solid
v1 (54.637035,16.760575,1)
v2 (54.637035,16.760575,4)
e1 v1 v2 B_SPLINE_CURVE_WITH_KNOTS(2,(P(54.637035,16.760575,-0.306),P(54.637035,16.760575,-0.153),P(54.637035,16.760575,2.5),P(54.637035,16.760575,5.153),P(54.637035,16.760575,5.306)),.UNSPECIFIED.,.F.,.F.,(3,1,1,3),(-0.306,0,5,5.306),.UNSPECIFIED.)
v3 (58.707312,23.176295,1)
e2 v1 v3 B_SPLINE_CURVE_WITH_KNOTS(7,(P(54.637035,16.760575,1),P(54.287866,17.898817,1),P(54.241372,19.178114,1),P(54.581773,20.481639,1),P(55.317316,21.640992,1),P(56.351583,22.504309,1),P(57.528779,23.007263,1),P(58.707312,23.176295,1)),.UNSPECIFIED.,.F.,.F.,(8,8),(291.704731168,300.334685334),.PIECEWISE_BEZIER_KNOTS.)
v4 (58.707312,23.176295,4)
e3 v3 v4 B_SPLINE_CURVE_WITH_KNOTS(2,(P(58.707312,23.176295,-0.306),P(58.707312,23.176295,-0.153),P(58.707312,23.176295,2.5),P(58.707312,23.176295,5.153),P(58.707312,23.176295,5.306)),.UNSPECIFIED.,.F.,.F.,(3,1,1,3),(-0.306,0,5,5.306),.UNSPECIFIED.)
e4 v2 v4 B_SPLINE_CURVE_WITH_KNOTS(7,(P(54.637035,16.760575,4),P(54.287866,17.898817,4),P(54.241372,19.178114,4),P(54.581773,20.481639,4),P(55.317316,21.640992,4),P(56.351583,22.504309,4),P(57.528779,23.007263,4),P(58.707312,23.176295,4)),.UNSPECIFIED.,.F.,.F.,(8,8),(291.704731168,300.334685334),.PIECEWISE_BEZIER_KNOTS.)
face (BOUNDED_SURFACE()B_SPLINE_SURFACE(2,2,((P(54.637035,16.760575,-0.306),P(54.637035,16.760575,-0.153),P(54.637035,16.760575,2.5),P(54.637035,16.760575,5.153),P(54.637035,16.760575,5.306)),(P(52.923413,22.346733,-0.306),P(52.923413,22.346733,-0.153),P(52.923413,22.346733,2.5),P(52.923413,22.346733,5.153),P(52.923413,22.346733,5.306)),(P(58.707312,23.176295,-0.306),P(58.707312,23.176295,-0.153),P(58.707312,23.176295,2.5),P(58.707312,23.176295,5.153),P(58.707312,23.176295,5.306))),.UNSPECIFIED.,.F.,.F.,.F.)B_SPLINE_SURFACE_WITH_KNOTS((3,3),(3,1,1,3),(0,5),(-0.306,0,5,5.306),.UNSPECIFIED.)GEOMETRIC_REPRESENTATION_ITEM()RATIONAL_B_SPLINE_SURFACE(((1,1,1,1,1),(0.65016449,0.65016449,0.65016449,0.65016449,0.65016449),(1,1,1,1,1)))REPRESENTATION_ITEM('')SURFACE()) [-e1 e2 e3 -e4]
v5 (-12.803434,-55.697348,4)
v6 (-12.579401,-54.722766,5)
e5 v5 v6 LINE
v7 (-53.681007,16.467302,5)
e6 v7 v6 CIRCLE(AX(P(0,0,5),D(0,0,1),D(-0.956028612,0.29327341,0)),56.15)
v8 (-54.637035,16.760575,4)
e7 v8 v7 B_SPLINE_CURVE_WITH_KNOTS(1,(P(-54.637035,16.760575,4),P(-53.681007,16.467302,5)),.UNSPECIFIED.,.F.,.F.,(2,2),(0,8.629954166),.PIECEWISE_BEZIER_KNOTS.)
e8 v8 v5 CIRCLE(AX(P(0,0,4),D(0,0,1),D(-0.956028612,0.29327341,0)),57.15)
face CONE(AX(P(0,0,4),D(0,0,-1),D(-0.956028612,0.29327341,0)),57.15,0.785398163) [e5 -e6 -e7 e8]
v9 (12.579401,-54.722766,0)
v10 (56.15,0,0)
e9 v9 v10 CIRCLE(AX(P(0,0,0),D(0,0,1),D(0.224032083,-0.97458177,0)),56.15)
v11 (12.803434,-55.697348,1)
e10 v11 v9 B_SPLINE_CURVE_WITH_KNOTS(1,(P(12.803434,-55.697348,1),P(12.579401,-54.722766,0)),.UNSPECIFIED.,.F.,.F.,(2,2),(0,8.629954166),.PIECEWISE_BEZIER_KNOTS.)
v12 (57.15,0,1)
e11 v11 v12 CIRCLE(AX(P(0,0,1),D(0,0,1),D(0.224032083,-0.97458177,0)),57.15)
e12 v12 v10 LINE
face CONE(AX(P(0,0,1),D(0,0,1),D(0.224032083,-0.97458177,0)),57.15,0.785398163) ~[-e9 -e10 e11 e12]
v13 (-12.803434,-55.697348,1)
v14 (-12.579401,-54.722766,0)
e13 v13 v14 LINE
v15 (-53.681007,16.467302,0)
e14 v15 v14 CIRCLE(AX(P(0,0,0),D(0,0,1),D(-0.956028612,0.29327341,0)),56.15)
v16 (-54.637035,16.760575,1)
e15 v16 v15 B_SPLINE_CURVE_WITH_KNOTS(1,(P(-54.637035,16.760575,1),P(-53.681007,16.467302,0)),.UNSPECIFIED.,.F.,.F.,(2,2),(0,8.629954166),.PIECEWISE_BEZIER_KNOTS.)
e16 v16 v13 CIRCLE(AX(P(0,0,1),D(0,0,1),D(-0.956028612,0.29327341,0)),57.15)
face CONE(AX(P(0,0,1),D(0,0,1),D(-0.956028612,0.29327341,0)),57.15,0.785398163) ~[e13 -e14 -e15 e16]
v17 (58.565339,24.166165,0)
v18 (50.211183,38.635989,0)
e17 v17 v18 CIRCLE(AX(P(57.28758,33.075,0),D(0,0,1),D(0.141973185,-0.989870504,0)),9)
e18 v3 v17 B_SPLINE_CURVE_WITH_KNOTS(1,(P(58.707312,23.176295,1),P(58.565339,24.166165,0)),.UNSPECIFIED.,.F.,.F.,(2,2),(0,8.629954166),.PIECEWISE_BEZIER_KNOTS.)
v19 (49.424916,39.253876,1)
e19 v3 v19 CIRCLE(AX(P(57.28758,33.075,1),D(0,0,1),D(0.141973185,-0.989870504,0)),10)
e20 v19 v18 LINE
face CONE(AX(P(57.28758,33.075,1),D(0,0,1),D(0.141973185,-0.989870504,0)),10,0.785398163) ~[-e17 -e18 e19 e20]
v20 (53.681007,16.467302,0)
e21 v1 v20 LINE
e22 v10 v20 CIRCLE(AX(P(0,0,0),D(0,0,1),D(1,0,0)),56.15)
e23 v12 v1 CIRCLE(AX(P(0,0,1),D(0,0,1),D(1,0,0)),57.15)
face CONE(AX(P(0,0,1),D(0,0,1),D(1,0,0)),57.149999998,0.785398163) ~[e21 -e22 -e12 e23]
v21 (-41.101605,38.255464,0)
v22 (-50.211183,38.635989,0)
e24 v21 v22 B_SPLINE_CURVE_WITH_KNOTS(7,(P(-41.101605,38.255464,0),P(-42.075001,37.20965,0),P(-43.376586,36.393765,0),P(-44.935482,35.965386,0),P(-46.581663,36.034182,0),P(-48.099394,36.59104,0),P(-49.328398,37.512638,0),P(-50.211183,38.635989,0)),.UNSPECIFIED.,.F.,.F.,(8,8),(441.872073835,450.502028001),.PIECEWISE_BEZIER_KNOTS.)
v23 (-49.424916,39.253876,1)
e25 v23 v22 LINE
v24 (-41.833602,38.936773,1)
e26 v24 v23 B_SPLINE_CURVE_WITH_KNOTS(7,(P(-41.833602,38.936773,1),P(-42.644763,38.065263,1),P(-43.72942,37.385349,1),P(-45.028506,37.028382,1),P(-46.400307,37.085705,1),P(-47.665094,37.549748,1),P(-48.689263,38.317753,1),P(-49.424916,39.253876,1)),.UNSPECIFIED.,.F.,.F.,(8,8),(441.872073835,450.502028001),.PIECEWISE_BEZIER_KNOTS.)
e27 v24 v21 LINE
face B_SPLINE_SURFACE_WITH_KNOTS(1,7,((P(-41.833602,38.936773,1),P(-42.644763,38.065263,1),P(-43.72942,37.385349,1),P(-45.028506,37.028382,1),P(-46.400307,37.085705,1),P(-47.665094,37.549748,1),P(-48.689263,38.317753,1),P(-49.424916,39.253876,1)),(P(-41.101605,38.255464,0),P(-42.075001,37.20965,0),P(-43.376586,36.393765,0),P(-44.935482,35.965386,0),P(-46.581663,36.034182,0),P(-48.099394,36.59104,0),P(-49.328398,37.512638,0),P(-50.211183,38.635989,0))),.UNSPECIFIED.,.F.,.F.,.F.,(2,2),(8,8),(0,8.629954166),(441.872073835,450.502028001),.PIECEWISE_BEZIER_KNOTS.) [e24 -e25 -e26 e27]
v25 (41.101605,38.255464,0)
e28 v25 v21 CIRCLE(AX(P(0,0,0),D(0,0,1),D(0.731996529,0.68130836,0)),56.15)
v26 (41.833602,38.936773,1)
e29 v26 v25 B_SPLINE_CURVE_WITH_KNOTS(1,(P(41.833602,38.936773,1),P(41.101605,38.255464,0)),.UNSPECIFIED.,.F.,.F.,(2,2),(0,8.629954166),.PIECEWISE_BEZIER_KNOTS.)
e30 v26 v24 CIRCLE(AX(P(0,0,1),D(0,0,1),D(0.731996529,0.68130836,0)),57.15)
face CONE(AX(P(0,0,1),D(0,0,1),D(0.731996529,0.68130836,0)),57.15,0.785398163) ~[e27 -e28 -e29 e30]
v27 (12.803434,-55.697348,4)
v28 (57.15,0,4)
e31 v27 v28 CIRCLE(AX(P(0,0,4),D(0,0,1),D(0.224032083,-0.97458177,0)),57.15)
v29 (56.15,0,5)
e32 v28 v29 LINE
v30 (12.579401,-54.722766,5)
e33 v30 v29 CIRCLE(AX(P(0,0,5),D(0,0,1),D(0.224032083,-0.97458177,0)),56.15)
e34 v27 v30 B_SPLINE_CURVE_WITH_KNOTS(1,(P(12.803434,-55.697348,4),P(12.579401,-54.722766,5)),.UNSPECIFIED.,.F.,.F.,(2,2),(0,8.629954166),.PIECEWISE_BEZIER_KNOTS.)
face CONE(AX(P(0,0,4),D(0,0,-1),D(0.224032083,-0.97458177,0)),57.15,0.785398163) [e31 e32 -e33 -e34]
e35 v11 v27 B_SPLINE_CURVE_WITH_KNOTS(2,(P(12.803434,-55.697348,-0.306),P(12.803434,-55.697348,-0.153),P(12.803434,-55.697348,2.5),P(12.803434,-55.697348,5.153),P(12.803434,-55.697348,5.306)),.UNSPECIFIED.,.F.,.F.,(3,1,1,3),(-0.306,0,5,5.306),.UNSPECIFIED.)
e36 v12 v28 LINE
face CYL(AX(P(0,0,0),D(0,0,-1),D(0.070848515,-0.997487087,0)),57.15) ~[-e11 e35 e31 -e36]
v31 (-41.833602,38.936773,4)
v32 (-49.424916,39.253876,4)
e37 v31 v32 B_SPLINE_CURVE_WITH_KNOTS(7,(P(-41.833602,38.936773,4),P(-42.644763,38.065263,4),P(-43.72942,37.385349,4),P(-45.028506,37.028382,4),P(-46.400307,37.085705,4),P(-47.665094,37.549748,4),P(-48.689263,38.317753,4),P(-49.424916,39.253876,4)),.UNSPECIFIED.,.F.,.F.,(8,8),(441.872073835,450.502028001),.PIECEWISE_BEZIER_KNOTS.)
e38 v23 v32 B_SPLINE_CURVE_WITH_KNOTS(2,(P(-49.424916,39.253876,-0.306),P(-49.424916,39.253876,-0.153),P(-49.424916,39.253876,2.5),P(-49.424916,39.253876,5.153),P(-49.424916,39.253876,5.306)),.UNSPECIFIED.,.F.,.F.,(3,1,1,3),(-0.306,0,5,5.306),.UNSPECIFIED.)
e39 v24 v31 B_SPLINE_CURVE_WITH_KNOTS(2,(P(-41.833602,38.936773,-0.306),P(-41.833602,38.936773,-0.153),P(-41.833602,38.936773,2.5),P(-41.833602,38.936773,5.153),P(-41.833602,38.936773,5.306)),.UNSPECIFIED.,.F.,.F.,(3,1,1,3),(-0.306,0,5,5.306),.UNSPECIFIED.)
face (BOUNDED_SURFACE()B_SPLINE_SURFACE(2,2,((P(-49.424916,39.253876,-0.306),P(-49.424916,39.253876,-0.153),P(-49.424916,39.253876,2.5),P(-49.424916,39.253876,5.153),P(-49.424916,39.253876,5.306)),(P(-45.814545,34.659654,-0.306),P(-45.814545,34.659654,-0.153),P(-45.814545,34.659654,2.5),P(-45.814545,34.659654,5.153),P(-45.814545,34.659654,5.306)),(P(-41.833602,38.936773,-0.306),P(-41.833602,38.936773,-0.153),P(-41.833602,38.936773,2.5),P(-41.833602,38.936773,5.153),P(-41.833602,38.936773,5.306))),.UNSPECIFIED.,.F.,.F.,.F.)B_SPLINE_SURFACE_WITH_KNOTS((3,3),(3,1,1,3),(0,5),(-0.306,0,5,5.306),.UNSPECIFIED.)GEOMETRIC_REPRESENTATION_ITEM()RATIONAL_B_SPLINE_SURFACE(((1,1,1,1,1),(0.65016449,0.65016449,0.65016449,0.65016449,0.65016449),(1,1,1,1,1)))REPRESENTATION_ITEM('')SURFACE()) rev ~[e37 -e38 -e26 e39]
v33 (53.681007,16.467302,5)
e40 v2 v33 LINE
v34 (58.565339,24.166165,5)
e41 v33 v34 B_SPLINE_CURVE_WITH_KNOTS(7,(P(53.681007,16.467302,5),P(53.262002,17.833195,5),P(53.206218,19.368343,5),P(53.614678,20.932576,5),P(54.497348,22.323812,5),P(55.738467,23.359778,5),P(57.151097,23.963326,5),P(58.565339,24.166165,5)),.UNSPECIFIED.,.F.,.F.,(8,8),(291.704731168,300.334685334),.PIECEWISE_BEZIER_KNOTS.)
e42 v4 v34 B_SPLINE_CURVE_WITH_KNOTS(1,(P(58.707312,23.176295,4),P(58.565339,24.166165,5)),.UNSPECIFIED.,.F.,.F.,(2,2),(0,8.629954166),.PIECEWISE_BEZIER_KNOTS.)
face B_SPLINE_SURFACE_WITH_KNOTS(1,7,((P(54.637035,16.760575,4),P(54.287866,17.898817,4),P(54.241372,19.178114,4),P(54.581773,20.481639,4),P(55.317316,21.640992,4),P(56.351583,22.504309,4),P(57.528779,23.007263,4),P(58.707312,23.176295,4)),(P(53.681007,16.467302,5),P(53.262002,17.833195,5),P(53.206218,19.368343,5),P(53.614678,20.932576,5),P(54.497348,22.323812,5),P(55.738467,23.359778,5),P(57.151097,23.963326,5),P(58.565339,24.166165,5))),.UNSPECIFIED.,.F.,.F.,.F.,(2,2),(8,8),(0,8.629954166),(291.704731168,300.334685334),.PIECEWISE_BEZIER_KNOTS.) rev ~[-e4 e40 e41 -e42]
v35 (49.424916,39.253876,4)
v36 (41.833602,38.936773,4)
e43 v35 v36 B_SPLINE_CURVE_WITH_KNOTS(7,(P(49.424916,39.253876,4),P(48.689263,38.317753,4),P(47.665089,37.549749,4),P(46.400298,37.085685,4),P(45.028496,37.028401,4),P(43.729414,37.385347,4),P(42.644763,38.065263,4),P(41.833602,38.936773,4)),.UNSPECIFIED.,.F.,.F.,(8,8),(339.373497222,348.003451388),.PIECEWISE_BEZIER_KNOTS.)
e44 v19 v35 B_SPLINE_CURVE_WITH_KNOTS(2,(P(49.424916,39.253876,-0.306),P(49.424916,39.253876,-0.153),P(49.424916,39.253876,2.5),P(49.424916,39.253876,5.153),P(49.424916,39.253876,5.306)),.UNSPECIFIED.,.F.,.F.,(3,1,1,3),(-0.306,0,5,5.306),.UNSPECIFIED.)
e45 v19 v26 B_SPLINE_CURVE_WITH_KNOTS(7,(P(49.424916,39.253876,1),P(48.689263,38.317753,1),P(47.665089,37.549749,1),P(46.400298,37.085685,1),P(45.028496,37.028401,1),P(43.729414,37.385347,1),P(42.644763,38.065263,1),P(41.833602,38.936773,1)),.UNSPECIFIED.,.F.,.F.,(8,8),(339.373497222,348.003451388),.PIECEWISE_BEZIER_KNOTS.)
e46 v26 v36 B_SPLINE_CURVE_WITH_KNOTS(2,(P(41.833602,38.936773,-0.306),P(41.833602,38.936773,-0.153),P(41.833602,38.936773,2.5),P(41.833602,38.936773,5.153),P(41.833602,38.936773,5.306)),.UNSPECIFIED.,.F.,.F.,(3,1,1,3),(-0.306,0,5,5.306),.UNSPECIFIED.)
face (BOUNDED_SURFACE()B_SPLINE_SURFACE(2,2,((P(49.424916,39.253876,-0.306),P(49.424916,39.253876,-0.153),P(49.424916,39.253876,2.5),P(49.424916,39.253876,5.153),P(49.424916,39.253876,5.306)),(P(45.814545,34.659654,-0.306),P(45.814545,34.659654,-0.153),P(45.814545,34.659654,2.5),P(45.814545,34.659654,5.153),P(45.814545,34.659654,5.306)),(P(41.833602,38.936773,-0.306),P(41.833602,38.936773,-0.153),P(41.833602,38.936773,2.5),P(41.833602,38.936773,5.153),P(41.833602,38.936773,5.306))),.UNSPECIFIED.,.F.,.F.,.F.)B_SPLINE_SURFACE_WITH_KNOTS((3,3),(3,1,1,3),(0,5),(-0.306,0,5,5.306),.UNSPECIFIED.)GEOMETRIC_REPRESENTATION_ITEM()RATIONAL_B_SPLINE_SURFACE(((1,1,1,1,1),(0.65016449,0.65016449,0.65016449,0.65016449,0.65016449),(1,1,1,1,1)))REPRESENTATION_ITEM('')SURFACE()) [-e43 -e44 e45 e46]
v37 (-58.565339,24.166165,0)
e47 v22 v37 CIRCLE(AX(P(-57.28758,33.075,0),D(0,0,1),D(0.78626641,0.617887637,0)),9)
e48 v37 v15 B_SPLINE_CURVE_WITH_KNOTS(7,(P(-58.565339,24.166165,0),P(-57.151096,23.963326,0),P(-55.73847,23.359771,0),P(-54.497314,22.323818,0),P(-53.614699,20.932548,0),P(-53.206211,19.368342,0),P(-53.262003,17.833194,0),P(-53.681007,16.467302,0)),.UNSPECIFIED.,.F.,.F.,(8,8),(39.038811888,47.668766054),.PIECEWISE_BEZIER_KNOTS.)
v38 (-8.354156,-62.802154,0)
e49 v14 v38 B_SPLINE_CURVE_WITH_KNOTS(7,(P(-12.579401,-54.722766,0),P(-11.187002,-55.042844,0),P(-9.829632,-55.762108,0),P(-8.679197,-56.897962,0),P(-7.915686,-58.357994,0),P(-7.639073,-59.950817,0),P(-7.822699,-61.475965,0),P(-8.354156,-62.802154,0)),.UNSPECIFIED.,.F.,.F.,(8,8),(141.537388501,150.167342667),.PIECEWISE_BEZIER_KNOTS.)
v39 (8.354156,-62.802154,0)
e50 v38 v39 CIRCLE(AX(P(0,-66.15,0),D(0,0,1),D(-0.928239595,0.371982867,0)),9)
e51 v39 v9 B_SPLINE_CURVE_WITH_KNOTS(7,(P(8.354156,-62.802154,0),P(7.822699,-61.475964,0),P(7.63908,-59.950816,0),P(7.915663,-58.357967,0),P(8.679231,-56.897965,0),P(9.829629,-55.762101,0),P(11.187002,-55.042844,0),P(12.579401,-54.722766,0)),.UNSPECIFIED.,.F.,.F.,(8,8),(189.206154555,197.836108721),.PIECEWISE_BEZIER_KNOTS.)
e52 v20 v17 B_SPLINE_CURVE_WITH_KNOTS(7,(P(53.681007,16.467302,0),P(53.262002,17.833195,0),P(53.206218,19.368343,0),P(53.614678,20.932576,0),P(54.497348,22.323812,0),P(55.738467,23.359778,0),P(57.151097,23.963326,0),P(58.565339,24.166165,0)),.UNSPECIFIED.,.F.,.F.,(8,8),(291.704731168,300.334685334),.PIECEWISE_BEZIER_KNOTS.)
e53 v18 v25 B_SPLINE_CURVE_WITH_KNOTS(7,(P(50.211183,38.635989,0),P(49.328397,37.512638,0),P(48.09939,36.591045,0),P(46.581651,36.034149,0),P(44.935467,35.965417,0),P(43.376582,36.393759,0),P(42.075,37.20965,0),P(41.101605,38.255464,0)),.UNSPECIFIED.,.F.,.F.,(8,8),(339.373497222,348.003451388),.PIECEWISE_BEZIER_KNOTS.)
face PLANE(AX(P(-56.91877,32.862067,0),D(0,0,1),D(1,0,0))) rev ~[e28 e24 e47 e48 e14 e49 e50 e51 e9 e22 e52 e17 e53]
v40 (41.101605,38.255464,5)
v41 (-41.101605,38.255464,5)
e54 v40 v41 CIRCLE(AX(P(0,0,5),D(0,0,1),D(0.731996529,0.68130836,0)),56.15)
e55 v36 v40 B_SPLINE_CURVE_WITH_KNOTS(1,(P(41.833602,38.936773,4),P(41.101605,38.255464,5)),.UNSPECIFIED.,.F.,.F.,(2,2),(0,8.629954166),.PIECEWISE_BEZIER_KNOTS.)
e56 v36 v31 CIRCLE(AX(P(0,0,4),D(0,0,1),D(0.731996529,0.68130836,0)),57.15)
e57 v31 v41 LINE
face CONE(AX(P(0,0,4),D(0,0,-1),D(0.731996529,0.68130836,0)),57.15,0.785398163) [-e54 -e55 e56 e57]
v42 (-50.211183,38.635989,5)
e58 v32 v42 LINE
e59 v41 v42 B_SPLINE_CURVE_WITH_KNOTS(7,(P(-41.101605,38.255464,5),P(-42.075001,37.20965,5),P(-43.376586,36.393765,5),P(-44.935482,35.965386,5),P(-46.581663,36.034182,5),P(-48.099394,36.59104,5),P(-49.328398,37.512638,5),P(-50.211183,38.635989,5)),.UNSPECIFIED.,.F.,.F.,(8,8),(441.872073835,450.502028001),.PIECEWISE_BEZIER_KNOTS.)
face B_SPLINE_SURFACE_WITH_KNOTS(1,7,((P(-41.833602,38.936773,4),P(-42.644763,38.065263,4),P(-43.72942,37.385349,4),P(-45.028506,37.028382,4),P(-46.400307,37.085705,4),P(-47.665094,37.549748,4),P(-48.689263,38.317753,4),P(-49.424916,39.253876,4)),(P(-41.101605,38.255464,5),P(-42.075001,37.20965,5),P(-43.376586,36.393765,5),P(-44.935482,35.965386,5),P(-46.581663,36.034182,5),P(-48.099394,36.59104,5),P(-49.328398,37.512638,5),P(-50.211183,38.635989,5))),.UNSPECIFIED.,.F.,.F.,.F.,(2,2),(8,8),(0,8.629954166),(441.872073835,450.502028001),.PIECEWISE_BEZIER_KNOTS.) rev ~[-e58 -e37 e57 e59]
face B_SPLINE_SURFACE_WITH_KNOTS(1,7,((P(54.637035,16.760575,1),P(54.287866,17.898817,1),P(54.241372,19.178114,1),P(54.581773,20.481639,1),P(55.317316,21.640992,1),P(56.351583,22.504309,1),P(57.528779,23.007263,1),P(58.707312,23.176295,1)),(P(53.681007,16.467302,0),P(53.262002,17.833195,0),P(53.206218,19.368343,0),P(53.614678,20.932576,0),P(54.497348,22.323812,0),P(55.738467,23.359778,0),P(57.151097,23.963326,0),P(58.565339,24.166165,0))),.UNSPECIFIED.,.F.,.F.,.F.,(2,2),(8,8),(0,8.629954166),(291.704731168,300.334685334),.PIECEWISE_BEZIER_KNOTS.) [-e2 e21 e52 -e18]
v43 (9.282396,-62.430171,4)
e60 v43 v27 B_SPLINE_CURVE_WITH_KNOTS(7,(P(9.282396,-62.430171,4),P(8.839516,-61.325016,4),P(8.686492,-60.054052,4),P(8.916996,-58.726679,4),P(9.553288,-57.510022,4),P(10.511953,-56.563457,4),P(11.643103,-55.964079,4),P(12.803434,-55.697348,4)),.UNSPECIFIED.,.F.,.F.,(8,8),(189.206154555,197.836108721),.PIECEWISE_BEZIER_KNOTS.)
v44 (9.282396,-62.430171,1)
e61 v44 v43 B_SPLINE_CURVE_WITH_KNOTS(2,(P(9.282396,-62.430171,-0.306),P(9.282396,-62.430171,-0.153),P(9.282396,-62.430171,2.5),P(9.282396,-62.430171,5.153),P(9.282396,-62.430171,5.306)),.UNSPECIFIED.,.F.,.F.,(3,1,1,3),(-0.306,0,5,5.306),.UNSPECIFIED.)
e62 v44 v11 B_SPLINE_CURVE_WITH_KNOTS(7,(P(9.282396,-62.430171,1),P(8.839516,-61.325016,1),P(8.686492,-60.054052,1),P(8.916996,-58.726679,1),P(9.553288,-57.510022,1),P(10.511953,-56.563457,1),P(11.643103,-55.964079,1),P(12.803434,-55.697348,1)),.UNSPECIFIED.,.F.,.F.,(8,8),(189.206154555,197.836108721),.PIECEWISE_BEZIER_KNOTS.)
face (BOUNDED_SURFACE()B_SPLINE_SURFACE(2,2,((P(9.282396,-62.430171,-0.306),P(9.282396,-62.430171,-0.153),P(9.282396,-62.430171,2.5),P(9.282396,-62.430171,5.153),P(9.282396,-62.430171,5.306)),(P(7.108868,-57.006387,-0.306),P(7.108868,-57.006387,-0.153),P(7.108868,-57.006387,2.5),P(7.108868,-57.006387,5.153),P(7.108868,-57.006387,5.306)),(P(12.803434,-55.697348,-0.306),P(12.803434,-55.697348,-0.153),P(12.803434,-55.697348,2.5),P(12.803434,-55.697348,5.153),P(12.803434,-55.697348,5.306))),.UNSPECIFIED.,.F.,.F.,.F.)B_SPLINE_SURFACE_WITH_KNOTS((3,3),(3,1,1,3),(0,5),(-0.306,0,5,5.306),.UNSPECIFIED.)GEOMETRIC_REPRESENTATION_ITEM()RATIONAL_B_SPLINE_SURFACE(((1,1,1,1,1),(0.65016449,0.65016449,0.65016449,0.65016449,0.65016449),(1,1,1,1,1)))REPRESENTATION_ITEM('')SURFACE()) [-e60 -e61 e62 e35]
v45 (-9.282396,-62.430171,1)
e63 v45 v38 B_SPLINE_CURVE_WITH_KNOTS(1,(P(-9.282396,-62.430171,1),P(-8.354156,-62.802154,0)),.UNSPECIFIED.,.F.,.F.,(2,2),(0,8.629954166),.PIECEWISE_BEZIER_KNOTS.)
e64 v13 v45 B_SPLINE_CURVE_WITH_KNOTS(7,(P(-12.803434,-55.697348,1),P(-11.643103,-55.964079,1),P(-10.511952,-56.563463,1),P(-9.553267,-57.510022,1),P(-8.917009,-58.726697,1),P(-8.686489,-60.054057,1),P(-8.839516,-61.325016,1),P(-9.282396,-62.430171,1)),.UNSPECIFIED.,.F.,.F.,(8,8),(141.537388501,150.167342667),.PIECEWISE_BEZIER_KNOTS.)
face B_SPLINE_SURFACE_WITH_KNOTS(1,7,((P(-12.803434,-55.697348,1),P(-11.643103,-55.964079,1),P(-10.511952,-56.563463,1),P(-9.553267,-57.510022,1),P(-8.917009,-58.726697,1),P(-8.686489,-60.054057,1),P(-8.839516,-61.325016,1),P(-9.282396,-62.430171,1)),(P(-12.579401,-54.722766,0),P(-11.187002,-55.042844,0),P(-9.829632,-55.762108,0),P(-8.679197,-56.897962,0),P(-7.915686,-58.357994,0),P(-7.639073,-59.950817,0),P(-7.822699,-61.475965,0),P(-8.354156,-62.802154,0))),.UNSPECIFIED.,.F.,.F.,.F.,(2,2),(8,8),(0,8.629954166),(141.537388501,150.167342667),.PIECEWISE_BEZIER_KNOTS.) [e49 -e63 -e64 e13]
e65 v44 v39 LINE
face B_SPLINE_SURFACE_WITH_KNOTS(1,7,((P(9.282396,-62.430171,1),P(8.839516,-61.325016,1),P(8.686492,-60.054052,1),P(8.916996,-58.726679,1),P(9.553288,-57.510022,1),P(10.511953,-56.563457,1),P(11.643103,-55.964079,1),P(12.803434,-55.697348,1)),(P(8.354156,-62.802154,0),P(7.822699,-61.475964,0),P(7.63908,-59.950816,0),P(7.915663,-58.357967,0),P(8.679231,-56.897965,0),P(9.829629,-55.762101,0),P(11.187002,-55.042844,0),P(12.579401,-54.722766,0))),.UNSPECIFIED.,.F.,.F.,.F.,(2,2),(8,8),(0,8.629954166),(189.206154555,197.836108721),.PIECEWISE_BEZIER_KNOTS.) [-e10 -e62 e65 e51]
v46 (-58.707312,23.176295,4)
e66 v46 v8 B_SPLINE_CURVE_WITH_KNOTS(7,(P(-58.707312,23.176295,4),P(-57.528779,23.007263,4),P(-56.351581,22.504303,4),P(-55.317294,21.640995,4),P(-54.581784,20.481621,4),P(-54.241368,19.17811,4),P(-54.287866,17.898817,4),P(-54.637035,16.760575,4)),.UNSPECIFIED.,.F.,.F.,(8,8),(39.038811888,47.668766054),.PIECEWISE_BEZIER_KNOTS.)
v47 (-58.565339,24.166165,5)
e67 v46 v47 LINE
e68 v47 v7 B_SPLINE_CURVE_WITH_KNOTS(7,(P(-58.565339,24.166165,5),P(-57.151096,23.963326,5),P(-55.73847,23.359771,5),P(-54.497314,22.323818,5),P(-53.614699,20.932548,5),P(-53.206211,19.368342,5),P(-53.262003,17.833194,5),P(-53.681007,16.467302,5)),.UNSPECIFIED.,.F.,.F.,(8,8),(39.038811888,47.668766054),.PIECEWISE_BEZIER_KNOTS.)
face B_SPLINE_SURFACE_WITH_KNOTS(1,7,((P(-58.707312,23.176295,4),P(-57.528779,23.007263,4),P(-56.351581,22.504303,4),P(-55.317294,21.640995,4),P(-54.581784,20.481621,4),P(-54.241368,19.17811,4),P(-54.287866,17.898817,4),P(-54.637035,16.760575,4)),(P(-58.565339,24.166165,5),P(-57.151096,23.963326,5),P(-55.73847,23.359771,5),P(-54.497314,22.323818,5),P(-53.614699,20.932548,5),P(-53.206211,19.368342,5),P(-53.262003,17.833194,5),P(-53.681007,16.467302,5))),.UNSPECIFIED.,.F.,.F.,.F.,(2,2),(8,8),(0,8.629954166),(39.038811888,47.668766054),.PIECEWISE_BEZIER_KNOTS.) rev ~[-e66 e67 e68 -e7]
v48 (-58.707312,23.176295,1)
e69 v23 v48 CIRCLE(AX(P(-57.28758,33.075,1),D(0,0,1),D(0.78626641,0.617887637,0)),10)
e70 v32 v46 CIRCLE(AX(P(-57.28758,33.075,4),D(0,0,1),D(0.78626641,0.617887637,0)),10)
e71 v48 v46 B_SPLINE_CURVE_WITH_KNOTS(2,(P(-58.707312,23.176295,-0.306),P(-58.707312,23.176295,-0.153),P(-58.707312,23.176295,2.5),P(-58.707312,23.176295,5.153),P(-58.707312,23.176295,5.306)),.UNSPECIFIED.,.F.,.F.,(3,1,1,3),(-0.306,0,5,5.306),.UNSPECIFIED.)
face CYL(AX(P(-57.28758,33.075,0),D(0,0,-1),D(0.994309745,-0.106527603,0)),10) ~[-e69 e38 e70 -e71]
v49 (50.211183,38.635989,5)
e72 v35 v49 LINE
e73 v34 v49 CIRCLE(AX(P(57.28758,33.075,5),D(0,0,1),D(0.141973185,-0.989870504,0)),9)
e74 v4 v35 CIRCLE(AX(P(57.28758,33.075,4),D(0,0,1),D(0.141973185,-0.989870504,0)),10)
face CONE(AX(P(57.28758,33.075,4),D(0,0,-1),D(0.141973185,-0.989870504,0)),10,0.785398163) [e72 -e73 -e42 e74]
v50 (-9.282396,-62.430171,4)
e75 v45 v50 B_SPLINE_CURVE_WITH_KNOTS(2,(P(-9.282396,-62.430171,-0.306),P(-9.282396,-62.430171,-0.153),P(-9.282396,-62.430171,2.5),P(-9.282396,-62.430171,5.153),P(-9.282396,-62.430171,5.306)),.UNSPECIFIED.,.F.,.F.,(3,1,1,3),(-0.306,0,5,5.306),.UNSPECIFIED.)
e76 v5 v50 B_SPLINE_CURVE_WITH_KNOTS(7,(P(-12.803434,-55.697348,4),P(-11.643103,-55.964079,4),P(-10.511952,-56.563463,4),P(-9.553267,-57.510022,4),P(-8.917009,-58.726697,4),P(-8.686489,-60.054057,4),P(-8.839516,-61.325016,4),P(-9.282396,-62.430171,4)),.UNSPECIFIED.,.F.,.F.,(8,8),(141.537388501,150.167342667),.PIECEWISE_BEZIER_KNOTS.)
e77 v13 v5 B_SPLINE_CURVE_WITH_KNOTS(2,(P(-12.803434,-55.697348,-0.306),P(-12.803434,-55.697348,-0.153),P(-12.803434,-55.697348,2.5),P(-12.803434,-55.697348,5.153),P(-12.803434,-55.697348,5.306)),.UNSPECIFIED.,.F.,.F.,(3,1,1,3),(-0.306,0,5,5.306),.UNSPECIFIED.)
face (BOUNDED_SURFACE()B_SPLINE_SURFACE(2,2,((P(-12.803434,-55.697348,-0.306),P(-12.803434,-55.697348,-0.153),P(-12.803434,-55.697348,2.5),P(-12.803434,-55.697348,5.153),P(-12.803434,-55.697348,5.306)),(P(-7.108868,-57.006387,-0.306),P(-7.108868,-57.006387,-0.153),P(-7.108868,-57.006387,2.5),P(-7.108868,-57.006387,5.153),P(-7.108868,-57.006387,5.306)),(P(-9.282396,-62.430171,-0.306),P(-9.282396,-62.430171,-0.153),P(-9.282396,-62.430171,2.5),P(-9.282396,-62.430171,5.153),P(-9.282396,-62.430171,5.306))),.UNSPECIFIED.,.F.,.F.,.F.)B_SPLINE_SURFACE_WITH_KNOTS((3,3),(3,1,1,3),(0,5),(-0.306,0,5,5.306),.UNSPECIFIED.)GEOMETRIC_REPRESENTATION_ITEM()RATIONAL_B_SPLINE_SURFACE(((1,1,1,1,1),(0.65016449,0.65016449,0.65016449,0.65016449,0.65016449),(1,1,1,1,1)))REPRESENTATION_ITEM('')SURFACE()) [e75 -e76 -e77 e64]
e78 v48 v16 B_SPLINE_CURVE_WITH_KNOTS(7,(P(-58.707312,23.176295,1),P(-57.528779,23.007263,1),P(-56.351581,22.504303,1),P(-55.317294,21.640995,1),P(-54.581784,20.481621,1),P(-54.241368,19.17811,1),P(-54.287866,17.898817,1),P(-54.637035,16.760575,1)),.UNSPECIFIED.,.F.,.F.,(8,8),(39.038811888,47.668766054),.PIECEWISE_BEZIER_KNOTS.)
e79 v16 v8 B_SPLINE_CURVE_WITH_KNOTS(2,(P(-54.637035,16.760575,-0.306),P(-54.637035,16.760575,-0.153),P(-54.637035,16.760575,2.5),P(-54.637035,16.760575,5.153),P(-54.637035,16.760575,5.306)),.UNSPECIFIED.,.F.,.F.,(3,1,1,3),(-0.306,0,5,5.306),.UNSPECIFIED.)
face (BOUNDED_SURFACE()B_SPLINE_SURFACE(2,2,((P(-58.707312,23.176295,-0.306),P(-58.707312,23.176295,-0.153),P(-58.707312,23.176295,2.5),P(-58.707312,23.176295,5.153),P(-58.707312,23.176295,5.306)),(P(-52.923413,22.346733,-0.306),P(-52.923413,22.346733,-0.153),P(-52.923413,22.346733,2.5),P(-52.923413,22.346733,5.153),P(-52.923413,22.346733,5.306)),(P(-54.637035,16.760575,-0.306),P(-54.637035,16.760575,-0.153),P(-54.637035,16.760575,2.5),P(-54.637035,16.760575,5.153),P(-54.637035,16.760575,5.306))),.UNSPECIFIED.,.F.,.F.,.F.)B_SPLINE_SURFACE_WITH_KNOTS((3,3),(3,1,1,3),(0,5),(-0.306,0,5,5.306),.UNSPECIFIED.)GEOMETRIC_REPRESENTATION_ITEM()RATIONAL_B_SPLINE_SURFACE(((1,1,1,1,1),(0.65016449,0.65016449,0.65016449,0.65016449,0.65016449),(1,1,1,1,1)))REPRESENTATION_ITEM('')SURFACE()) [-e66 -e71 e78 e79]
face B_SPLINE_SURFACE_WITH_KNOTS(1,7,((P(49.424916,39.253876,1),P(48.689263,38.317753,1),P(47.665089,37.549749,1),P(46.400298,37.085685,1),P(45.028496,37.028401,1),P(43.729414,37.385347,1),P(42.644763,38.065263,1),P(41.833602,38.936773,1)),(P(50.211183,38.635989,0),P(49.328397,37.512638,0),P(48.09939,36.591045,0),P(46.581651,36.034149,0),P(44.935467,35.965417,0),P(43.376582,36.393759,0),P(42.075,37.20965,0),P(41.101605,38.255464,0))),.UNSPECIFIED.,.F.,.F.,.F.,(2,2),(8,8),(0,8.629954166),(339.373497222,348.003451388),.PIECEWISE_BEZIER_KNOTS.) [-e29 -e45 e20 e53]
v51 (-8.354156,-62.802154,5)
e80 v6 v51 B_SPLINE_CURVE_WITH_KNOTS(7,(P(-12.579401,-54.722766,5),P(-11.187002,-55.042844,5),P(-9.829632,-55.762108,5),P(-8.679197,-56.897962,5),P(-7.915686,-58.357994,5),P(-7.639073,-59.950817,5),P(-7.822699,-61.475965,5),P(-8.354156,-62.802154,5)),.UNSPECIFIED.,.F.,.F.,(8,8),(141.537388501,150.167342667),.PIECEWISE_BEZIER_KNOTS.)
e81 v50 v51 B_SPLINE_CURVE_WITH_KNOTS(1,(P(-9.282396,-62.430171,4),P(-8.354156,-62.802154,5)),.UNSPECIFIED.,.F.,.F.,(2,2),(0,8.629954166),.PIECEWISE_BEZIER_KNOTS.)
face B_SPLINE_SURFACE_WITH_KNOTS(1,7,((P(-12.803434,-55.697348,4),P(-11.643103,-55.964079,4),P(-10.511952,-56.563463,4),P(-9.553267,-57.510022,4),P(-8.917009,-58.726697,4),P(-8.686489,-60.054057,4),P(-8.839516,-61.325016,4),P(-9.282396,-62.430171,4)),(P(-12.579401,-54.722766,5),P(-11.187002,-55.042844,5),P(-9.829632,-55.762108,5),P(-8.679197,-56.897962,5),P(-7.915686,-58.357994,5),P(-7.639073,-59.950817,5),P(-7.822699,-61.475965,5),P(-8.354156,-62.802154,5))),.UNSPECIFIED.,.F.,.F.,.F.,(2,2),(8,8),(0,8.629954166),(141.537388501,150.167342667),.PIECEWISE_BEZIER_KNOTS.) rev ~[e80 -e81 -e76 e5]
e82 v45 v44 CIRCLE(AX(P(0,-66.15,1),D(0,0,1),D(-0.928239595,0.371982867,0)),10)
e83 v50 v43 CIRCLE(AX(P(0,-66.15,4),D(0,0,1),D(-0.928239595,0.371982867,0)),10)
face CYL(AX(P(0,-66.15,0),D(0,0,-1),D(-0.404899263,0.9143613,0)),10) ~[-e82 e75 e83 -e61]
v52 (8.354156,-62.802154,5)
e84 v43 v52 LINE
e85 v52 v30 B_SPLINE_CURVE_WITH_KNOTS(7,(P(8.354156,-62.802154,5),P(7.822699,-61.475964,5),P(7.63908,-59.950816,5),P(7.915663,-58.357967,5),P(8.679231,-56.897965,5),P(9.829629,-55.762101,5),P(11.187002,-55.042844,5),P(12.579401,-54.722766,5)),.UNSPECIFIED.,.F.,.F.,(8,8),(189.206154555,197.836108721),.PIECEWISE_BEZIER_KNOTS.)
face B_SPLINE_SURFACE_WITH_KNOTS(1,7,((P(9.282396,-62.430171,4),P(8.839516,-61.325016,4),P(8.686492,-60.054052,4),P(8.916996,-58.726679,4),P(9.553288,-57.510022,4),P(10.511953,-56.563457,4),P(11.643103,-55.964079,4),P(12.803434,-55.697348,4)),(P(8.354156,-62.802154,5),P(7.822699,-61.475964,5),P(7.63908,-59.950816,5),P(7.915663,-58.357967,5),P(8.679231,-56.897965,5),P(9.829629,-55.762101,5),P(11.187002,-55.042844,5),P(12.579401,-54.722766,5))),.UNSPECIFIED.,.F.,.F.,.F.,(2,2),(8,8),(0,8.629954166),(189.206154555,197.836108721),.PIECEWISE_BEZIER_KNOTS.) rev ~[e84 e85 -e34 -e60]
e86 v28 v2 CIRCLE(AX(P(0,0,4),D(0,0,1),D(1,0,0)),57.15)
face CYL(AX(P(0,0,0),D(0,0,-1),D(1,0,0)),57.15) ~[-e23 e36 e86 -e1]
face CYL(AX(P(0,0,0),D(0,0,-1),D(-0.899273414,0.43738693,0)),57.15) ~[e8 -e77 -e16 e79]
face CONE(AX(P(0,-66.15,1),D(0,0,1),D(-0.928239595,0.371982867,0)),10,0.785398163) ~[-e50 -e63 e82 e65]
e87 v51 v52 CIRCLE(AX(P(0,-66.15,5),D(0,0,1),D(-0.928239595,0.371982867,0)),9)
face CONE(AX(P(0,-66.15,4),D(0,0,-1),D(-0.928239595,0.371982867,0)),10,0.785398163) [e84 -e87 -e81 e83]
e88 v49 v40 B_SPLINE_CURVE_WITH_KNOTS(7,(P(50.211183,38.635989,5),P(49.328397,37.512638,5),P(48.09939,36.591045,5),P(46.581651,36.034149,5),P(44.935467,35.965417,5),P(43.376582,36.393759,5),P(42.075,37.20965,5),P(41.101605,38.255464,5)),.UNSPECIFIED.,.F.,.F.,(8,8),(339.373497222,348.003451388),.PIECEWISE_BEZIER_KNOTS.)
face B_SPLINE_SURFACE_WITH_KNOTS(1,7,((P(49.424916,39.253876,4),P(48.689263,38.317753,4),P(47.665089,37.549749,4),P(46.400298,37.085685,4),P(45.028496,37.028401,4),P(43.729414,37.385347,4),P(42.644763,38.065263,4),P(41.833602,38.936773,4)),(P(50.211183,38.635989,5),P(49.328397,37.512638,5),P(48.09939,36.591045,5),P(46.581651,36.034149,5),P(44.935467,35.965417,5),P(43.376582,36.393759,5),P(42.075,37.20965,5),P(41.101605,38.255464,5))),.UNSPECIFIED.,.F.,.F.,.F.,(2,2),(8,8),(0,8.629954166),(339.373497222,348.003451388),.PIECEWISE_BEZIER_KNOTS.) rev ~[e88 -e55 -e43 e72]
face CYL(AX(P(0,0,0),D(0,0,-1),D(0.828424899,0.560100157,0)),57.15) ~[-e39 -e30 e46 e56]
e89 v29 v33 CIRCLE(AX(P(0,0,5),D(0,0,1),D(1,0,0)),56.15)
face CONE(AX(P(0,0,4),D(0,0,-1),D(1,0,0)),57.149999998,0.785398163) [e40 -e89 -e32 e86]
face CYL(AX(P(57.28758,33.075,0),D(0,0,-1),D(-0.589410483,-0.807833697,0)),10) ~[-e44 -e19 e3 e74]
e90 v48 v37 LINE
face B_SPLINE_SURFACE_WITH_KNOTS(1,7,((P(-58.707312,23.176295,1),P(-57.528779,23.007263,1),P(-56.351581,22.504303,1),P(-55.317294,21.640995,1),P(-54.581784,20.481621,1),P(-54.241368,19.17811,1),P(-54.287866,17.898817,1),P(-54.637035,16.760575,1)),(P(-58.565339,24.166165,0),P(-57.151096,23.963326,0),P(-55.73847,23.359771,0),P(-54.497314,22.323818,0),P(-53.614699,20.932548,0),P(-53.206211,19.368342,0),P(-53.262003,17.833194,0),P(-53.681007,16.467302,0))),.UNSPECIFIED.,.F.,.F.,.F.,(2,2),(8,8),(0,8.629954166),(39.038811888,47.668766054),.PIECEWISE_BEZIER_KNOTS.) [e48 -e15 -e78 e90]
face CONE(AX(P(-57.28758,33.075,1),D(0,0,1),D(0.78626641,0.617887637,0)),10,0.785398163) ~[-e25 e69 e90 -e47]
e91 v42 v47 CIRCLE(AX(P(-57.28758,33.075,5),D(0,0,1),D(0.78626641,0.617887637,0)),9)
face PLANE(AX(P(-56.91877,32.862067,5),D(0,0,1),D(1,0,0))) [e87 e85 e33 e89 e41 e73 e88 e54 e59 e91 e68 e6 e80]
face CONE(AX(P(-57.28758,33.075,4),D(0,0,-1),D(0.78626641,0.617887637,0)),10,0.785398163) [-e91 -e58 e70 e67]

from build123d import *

# Parameters (mm, degrees)
F1_DEPTH = 5
F2_R     = 5
F3_SIZE  = 1


with BuildPart() as f1:
    # F0 (on Top) → F1 (new body)
    with BuildSketch(Plane.XY):
        with BuildLine():
            ThreePointArc((-51.3934756327, 24.996663025), (-49.4933518263, 28.575), (-47.3444830059, 32.0097239742))
            ThreePointArc((-47.3444830059, 32.0097239742), (-65.9478344982, 38.075), (-51.3934756327, 24.996663025))
        make_face()
        with BuildLine():
            ThreePointArc((47.3444830059, 32.0097239742), (49.4933518263, 28.575), (51.3934756327, 24.996663025))
            ThreePointArc((51.3934756327, 24.996663025), (65.9478344982, 38.075), (47.3444830059, 32.0097239742))
        make_face()
        with BuildLine():
            ThreePointArc((4.0489926269, -57.0063869992), (41.8181923846, -38.9533218826), (57.15, 0))
            ThreePointArc((57.15, 0), (55.6922778867, 12.8254701198), (51.3934756327, 24.996663025))
            ThreePointArc((51.3934756327, 24.996663025), (49.4933518263, 28.575), (47.3444830059, 32.0097239742))
            ThreePointArc((47.3444830059, 32.0097239742), (0, 57.15), (-47.3444830059, 32.0097239742))
            ThreePointArc((-47.3444830059, 32.0097239742), (-49.4933518263, 28.575), (-51.3934756327, 24.996663025))
            ThreePointArc((-51.3934756327, 24.996663025), (-49.4933518263, -28.575), (-4.0489926269, -57.0063869992))
            ThreePointArc((-4.0489926269, -57.0063869992), (0, -57.15), (4.0489926269, -57.0063869992))
        make_face()
        with BuildLine():
            ThreePointArc((-4.0489926269, -57.0063869992), (0, -76.15), (4.0489926269, -57.0063869992))
            ThreePointArc((4.0489926269, -57.0063869992), (0, -57.15), (-4.0489926269, -57.0063869992))
        make_face()
    extrude(amount=F1_DEPTH)

    # F2
    f2_edges = [f1.edges().sort_by_distance(p)[0] for p in [
        (-4.048993, -57.006387, 2.5),
        (-47.344483, 32.009724, 2.5),
        (51.393476, 24.996663, 2.5),
        (-51.393476, 24.996663, 2.5),
        (4.048993, -57.006387, 2.5),
        (47.344483, 32.009724, 2.5),
    ]]
    fillet(f2_edges, radius=F2_R)

    # F3
    f3_edges = [f1.edges().sort_by_distance(p)[0] for p in [
        (-65.947834, 38.075, 0),
        (-45.702262, 37.347671, 0),
        (-55.195163, 20.905484, 0),
        (0, 57.15, 0),
        (-49.493352, -28.575, 0),
        (45.702262, 37.347671, 0),
        (-9.492901, -58.253155, 0),
        (65.947834, 38.075, 0),
        (0, -76.15, 0),
        (55.195163, 20.905484, 0),
        (9.492901, -58.253155, 0),
        (49.493352, -28.575, 0),
        (-65.947834, 38.075, 5),
        (-45.702262, 37.347671, 5),
        (-55.195163, 20.905484, 5),
        (0, 57.15, 5),
        (-49.493352, -28.575, 5),
        (45.702262, 37.347671, 5),
        (-9.492901, -58.253155, 5),
        (65.947834, 38.075, 5),
        (0, -76.15, 5),
        (55.195163, 20.905484, 5),
        (9.492901, -58.253155, 5),
        (49.493352, -28.575, 5),
    ]]
    chamfer(f3_edges, length=F3_SIZE)


solid = f1.part
